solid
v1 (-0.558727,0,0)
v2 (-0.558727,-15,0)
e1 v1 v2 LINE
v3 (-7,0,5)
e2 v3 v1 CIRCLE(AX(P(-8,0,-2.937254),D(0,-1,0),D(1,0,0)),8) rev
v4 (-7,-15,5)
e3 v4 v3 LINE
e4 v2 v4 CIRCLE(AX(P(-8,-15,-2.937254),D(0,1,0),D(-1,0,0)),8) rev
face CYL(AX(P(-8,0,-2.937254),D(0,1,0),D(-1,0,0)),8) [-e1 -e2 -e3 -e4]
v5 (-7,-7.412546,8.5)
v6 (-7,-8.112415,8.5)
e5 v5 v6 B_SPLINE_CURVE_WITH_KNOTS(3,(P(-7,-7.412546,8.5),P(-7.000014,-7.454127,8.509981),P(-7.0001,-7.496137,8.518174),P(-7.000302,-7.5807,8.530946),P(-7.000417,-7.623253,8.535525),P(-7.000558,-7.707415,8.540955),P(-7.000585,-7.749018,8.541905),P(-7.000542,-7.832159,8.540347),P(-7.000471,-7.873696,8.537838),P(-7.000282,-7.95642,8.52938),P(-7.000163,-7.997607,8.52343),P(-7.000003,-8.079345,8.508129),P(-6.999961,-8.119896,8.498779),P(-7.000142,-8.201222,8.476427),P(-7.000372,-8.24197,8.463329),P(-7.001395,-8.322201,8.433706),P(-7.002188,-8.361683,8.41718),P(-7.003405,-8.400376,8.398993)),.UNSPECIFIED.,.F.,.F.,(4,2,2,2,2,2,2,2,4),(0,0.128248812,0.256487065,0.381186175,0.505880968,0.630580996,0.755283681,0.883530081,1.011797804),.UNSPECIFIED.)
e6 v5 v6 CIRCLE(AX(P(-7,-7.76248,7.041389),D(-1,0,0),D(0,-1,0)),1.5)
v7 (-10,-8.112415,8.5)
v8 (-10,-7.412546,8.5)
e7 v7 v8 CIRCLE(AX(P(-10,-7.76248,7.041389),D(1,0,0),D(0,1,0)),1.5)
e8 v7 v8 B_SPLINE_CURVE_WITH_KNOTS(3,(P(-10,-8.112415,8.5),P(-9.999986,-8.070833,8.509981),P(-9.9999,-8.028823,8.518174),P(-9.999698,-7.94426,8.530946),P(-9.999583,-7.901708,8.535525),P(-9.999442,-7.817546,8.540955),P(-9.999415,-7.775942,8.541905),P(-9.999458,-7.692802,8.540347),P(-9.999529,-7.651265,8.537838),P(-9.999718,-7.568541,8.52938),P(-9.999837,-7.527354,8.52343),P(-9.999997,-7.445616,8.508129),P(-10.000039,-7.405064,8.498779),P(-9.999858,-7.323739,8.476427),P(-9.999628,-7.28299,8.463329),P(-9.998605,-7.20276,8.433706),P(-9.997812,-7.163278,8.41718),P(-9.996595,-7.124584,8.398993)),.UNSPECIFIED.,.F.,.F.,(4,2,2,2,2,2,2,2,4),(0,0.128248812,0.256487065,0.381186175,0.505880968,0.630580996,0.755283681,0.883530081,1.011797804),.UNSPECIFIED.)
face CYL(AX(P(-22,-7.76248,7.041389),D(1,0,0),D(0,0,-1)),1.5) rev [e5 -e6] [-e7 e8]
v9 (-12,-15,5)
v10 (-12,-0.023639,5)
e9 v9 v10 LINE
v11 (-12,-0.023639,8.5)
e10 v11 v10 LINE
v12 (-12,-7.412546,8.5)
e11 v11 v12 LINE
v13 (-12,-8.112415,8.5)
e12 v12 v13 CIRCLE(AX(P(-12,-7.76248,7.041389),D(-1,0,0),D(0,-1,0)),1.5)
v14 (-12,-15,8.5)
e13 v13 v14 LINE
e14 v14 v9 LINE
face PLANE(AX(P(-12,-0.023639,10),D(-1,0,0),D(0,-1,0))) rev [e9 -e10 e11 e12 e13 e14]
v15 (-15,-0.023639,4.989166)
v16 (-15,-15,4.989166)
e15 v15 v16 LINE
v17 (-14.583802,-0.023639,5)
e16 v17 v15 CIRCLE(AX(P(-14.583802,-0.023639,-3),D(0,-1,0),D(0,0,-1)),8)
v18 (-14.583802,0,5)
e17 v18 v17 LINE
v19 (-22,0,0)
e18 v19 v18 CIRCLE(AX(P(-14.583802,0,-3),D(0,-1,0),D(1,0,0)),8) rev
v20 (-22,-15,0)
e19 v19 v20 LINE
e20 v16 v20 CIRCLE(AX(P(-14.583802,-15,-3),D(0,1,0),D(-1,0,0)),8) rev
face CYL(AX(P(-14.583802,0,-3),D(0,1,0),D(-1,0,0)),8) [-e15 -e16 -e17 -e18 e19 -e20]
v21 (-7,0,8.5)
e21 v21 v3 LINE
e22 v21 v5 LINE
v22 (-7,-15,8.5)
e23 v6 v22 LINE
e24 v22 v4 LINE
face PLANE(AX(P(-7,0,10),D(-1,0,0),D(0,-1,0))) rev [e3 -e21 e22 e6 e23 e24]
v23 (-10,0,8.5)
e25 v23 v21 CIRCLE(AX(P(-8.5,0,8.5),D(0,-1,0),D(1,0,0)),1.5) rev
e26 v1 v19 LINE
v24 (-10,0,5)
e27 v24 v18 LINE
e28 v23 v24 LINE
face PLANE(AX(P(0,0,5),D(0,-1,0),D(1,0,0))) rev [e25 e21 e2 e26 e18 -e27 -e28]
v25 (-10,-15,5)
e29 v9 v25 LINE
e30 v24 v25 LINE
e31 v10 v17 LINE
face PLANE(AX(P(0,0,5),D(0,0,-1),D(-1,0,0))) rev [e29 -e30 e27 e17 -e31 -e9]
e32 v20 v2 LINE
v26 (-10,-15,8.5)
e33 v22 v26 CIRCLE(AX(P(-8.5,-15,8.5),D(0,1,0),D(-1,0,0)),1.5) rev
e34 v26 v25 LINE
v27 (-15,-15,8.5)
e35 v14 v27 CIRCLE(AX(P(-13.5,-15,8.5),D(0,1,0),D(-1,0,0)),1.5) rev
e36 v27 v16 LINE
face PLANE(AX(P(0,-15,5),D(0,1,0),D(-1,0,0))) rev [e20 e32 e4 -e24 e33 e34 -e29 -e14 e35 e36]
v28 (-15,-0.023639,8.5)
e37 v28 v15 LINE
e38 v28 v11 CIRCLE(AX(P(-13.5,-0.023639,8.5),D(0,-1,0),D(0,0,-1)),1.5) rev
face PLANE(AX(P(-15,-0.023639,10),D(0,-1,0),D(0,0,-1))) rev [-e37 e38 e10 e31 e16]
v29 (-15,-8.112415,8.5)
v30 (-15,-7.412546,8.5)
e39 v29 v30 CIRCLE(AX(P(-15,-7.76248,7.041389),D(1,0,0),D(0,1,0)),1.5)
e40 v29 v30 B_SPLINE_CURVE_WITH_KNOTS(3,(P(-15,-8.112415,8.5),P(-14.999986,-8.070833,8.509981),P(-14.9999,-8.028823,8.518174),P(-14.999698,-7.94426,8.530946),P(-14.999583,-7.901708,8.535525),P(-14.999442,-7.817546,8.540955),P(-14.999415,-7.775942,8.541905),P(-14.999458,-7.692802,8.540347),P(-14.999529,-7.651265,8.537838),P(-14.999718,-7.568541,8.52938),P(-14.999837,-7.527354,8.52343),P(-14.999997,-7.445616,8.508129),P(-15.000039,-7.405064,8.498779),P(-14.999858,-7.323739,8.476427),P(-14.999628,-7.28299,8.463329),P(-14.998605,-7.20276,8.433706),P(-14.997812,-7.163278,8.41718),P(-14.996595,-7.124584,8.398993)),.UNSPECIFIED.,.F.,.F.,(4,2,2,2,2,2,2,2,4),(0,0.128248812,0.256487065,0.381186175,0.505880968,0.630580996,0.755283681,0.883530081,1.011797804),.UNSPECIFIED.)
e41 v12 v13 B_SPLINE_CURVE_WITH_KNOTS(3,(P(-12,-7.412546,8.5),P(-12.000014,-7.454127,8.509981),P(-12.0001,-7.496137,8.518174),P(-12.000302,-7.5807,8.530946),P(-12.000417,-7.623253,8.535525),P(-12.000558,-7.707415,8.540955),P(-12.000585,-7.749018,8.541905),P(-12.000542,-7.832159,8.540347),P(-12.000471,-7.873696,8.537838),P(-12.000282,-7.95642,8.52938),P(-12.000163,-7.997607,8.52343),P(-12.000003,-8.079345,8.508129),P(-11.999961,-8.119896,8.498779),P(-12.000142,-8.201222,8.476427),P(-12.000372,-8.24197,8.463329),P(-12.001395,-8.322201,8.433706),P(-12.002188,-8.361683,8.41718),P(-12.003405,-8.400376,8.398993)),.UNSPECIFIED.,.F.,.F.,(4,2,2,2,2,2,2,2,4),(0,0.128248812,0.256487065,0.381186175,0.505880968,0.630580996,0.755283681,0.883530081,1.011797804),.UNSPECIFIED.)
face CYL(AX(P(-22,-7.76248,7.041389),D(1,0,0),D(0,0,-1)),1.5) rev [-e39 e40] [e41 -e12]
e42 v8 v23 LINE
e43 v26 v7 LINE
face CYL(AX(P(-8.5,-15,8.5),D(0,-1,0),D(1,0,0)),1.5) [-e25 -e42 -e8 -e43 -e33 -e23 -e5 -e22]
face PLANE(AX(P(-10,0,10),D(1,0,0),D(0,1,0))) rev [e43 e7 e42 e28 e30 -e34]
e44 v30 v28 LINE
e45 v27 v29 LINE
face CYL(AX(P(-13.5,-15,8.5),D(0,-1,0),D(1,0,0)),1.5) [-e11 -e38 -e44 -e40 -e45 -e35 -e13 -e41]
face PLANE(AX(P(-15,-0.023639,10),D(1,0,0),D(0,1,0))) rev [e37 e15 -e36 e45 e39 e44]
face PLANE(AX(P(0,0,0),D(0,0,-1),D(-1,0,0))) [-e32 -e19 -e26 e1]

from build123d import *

# Parameters (mm, degrees)
SKETCH1_W               = 22
SKETCH1_H               = 15
BOSS_EXTRUDE1_DEPTH     = 5
SKETCH2_W               = 3
SKETCH2_H               = 15
SKETCH2_H_2             = 14.97636143
BOSS_EXTRUDE2_DEPTH     = 5
CUT_EXTRUDE2_DEPTH      = 22.656407828
CUT_EXTRUDE2_DEPTH_BACK = 22.656407828
SKETCH4_R               = 1.5
FILLET1_R               = 8
FILLET3_RADIUS          = 1.5
FILLET3_LENGTH          = 14.97636143
FILLET4_RADIUS          = 1.5
FILLET4_LENGTH          = 15


with BuildPart() as part:
    # Sketch1 → Boss-Extrude1 (new body)
    with BuildSketch(Plane.XY):
        with Locations((-11, -7.5)):
            Rectangle(SKETCH1_W, SKETCH1_H)
    extrude(amount=BOSS_EXTRUDE1_DEPTH)

    # Sketch2 → Boss-Extrude2 (add)
    with BuildSketch(Plane.XY.offset(5)):
        with Locations((-8.5, -7.5)):
            Rectangle(SKETCH2_W, SKETCH2_H)
        with Locations((-13.5, -7.511819285)):
            Rectangle(SKETCH2_W, SKETCH2_H_2)
    extrude(amount=BOSS_EXTRUDE2_DEPTH)

    # Sketch4 → Cut-Extrude2 (cut, two sides: drawn at the far end of the back side and taken through both)
    with BuildSketch(Plane(origin=(-12, 0, 0), x_dir=(0, 0, -1), z_dir=(1, 0, 0)).offset(-CUT_EXTRUDE2_DEPTH_BACK)):
        with Locations(Location((-7.041389116, -7.762480296, 0), (0, 0, 270))):
            Circle(SKETCH4_R)
    extrude(amount=CUT_EXTRUDE2_DEPTH + CUT_EXTRUDE2_DEPTH_BACK, mode=Mode.SUBTRACT)

    # Fillet1
    # the kernel refuses this fillet: 8 mm, written as the material it takes off along each edge
    with BuildSketch(Plane(origin=(-22, 18.540496218, 5), x_dir=(1, 0, 0), z_dir=(0, -1, 0))) as fillet1_piece_1_section:
        with BuildLine():
            CenterArc((7.416198487, -8), FILLET1_R, 90, 67.975687163)
            Line((0, -5), (0, 0))
            Line((0, 0), (7.416198487, 0))
        make_face()
    fillet1_piece_1 = extrude(amount=52.080992435, mode=Mode.PRIVATE)
    fillet1_piece_1 = split(fillet1_piece_1, bisect_by=Plane(origin=(-22, -0.02363857, 5), z_dir=(0, 1, 0)), keep=Keep.TOP, mode=Mode.PRIVATE)
    add(fillet1_piece_1, mode=Mode.SUBTRACT)
    with BuildSketch(Plane(origin=(-22, 18.540496218, 5), x_dir=(1, 0, 0), z_dir=(0, -1, 0))) as fillet1_piece_2_section:
        with BuildLine():
            CenterArc((7.416198487, -8), FILLET1_R, 90, 67.975687163)
            Line((0, -5), (0, 0))
            Line((0, 0), (7.416198487, 0))
        make_face()
    fillet1_piece_2 = extrude(amount=52.080992435, mode=Mode.PRIVATE)
    fillet1_piece_2 = split(fillet1_piece_2, bisect_by=Plane(origin=(-15, 18.540496218, 5), z_dir=(-1, 0, 0)), keep=Keep.TOP, mode=Mode.PRIVATE)
    add(fillet1_piece_2, mode=Mode.SUBTRACT)
    with BuildSketch(Plane(origin=(0, -34.843134833, 5), x_dir=(0, 0, -1), z_dir=(0, 1, 0))) as fillet1_piece_3:
        with BuildLine():
            CenterArc((7.937253933, 8), FILLET1_R, 187.180755781, 82.819244219)
            Line((0, 7), (0, 0))
            Line((0, 0), (7.937253933, 0))
        make_face()
    extrude(amount=54.686269666, mode=Mode.SUBTRACT)

    # Fillet3: full round fillet: the end face becomes a half cylinder, R = half its width
    fillet3_face = Plane((-13.5, -7.511819285, 10), x_dir=(0, -1, 0), z_dir=(0, 0, 1))  # on the end face: x along it, z out of the body
    fillet3_slab = fillet3_face.offset(-FILLET3_RADIUS / 2) * Box(FILLET3_LENGTH, 2 * FILLET3_RADIUS, FILLET3_RADIUS, mode=Mode.PRIVATE)  # the body's end, R deep
    fillet3_round = Plane((-13.5, -7.511819285, 8.5), x_dir=(0, 0, 1), z_dir=(0, -1, 0)) * Cylinder(FILLET3_RADIUS, FILLET3_LENGTH, mode=Mode.PRIVATE)  # its axis R under the face
    add(fillet3_slab - fillet3_round, mode=Mode.SUBTRACT)

    # Fillet4: full round fillet: the end face becomes a half cylinder, R = half its width
    fillet4_face = Plane((-8.5, -7.5, 10), x_dir=(0, -1, 0), z_dir=(0, 0, 1))  # on the end face: x along it, z out of the body
    fillet4_slab = fillet4_face.offset(-FILLET4_RADIUS / 2) * Box(FILLET4_LENGTH, 2 * FILLET4_RADIUS, FILLET4_RADIUS, mode=Mode.PRIVATE)  # the body's end, R deep
    fillet4_round = Plane((-8.5, -7.5, 8.5), x_dir=(0, 0, 1), z_dir=(0, -1, 0)) * Cylinder(FILLET4_RADIUS, FILLET4_LENGTH, mode=Mode.PRIVATE)  # its axis R under the face
    add(fillet4_slab - fillet4_round, mode=Mode.SUBTRACT)


solid = part.part
